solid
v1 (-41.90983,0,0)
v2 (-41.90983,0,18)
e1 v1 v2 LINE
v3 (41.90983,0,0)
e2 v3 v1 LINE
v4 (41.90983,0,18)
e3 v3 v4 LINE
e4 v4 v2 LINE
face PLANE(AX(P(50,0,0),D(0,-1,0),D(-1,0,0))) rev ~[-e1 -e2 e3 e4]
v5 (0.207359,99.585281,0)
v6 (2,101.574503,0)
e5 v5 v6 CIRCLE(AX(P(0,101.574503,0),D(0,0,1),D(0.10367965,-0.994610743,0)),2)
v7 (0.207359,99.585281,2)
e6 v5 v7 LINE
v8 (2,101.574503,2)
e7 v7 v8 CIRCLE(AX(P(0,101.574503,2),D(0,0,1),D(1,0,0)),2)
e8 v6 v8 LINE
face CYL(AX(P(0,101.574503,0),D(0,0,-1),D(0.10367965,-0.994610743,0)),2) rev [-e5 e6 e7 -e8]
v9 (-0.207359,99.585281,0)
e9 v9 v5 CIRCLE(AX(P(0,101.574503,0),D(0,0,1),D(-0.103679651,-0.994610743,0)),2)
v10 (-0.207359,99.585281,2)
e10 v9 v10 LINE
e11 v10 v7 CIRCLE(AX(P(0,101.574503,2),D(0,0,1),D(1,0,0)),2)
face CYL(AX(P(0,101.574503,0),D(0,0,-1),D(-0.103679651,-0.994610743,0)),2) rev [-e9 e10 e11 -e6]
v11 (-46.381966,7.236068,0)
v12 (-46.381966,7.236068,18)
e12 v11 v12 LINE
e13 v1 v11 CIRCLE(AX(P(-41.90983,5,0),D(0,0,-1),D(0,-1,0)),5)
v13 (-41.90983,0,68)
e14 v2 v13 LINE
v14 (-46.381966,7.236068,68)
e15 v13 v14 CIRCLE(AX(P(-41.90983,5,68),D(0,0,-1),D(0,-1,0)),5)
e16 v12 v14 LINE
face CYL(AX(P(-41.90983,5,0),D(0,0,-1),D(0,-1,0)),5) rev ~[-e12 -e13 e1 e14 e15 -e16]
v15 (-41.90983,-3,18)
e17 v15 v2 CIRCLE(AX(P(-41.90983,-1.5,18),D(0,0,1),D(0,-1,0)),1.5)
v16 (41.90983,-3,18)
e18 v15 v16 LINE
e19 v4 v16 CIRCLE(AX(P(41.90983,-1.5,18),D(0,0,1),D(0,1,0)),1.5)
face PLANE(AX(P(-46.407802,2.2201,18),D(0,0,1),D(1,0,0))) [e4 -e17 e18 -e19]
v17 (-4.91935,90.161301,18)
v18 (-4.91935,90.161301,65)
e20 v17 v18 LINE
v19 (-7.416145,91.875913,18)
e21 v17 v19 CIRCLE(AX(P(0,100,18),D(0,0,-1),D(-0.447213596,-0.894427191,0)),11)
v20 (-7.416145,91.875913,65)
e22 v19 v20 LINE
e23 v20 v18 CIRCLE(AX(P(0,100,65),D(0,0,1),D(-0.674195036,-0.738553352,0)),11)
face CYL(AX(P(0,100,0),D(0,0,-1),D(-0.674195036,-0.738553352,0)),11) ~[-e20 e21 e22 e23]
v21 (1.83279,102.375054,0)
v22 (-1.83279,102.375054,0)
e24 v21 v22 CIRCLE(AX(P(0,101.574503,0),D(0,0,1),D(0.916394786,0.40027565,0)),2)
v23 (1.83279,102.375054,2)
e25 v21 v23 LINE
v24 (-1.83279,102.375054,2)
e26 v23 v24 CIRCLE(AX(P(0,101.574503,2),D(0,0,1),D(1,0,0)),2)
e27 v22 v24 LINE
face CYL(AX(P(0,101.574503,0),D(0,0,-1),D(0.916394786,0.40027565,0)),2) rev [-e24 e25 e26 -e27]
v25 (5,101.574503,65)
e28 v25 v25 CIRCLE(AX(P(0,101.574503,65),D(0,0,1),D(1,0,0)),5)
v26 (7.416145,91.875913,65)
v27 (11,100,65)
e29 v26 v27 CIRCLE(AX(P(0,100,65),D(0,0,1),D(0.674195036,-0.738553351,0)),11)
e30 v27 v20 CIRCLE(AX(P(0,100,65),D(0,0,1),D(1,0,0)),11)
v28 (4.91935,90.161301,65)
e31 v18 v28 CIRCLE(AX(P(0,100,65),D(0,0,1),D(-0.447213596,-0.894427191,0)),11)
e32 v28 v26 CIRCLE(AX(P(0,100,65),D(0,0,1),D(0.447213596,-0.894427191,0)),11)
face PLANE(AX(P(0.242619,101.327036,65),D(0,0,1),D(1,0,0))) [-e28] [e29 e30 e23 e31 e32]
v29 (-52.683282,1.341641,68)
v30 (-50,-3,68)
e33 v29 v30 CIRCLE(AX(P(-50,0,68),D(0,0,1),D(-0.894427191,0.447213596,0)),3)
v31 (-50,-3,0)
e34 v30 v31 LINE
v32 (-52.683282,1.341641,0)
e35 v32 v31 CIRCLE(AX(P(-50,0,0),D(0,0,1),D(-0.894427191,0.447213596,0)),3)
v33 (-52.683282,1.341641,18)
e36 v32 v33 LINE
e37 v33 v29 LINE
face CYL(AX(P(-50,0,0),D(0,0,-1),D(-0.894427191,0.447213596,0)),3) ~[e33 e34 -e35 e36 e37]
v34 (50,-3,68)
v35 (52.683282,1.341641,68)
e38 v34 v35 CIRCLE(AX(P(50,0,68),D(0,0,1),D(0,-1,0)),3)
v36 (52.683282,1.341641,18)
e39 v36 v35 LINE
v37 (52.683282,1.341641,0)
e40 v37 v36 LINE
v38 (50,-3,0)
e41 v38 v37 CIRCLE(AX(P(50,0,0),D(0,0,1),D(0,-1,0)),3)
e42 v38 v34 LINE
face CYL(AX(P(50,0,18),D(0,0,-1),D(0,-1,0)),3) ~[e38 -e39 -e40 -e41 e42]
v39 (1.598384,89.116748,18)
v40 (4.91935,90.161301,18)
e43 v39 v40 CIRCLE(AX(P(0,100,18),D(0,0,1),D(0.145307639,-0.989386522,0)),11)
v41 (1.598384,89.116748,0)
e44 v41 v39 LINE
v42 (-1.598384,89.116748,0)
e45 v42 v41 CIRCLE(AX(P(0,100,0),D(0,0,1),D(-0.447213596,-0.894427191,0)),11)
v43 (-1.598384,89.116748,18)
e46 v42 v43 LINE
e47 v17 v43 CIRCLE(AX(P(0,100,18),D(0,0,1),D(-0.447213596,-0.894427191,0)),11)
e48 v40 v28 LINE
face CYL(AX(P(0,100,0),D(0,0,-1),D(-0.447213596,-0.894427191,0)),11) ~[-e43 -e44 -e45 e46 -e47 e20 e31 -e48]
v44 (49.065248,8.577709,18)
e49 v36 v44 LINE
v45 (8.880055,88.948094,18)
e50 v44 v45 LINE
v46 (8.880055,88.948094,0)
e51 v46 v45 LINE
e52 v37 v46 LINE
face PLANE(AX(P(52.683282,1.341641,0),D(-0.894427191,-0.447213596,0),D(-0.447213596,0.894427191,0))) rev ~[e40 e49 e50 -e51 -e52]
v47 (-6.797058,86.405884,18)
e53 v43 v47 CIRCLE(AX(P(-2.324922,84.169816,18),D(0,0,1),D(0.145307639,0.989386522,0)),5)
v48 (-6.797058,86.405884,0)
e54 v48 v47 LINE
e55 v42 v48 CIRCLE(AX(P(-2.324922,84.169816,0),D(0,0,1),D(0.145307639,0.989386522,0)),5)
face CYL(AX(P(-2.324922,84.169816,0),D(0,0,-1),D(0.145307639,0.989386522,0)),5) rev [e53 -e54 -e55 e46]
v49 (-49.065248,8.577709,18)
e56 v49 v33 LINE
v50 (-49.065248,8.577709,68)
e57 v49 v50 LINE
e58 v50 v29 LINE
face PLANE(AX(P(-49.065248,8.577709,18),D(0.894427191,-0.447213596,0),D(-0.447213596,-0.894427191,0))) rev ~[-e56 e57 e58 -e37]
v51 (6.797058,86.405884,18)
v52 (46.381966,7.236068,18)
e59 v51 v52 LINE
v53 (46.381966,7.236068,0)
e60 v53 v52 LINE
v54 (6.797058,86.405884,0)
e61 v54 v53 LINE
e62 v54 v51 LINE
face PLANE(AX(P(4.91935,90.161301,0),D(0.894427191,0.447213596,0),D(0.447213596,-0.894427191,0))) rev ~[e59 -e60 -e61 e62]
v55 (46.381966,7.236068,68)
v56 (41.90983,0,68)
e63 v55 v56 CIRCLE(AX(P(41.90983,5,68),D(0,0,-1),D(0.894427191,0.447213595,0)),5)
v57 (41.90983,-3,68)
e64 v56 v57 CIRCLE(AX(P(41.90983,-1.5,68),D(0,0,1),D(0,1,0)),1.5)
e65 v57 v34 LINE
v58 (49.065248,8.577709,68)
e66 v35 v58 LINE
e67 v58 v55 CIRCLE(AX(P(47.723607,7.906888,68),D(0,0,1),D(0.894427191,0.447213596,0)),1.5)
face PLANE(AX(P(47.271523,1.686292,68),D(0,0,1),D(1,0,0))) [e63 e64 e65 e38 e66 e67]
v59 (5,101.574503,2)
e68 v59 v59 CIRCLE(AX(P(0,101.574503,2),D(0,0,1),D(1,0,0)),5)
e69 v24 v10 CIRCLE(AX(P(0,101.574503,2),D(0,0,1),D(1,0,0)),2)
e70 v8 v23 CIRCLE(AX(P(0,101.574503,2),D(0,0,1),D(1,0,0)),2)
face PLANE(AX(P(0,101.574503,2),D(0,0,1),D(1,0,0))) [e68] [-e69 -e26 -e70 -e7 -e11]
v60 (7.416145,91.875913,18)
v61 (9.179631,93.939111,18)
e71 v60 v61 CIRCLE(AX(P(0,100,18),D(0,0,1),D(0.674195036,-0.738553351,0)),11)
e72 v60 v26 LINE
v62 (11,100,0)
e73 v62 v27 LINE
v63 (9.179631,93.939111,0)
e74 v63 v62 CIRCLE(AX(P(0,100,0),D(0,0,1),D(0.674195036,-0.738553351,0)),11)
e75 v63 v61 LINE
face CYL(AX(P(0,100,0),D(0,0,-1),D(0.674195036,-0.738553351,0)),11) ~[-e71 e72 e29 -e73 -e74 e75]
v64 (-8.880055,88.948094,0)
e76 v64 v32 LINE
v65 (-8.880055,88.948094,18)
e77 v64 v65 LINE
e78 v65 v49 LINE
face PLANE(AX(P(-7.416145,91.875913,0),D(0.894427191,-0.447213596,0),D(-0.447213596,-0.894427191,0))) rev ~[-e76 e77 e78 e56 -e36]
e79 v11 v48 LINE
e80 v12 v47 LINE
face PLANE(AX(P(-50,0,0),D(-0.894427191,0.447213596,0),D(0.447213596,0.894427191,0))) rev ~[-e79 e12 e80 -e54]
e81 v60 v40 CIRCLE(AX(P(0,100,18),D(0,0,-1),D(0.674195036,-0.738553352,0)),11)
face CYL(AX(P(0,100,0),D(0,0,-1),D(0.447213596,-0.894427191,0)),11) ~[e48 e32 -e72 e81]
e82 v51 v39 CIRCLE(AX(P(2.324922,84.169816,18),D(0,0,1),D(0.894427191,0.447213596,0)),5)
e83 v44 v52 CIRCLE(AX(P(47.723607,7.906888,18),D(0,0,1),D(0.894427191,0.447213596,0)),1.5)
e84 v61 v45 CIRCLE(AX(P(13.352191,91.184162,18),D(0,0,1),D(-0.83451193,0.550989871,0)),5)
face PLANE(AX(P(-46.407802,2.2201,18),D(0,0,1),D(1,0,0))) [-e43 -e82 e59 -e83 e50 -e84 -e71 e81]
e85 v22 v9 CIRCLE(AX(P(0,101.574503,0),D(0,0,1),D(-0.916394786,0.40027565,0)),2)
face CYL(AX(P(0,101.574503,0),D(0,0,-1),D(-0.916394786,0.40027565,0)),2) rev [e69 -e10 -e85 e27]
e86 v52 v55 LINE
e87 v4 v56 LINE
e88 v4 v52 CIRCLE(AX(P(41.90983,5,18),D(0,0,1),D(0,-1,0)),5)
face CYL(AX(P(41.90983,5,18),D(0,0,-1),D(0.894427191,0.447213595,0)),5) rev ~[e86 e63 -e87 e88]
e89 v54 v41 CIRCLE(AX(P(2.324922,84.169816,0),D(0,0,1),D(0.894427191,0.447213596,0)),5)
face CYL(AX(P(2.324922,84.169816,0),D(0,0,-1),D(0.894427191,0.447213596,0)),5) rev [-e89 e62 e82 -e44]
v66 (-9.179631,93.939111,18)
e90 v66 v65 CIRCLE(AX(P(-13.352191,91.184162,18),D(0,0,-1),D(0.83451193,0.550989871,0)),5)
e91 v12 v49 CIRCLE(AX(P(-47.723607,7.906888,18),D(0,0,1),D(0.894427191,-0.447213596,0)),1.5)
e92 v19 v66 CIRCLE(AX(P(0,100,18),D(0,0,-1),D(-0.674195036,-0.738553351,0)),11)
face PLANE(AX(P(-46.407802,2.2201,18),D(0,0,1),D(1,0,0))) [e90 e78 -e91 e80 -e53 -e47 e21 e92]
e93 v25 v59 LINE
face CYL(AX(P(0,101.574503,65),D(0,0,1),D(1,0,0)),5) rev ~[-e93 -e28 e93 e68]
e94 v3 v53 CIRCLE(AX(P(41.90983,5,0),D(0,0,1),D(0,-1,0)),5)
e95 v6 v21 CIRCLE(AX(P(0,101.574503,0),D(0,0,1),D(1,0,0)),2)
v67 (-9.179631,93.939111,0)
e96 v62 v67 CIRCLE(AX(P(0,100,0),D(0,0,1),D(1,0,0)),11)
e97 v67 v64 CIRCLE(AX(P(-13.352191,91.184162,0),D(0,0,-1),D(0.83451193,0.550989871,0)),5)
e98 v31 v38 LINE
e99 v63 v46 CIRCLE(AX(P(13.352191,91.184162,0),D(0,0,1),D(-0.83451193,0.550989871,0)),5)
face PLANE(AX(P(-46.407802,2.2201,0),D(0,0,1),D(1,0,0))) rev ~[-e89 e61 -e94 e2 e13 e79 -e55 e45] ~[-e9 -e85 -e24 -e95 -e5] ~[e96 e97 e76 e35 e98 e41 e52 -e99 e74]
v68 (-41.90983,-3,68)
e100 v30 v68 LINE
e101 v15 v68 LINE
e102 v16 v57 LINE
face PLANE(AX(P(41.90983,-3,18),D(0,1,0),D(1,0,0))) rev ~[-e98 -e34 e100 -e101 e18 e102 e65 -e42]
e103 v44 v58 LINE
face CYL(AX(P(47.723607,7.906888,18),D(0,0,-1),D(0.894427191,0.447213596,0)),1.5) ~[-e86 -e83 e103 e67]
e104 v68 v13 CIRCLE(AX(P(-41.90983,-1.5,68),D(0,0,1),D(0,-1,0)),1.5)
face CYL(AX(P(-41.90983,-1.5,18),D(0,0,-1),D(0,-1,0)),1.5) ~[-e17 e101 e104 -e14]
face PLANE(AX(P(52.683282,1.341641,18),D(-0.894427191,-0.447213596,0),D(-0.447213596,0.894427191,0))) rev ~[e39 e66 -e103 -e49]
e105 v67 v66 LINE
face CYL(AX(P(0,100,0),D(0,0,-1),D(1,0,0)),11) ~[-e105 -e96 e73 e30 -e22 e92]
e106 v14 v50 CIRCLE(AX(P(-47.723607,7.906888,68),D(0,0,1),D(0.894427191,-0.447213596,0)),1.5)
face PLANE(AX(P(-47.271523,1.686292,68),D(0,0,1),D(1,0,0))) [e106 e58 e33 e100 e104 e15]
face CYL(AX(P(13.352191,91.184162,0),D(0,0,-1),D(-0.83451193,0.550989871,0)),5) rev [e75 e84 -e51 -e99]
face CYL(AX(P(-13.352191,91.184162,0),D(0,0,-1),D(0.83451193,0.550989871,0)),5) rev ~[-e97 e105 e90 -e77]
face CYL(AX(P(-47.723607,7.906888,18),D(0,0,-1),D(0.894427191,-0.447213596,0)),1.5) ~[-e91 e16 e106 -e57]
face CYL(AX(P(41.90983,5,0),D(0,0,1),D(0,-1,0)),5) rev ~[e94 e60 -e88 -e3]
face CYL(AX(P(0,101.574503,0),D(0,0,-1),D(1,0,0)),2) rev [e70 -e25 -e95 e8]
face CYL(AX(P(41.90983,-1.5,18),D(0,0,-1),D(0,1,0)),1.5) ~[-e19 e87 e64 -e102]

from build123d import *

# Parameters (mm, degrees)
F1_DEPTH    = 65
F2_DEPTH    = 18
F3_DEPTH    = 65
F4_R        = 5
F5_T1_DEPTH = 18
F7_DEPTH    = 50
F8_R        = 5
F8_R_2      = 2
F9_DEPTH    = 63


# Not quite as in the source:
# - a fillet or chamfer that OpenCascade refuses, or shapes differently, is made with other operations: its cross-section is extruded or revolved along the edge and cut away or added


with BuildPart() as f1:
    # F0 (on Top) → F1 (new body)
    with BuildSketch(Plane.XY):
        with BuildLine():
            ThreePointArc((11, 100), (-4.4397297556, 110.0642336865), (-7.4161453995, 91.8759131335))
            Line((-7.4161453995, 91.8759131335), (-4.039885348, 98.6284332366))
            ThreePointArc((-4.039885348, 98.6284332366), (-1.5492858452, 106.3284184683), (5, 101.5745028853))
            ThreePointArc((5, 101.5745028853), (4.753915583, 100.0252170402), (4.039885348, 98.6284332366))
            Line((4.039885348, 98.6284332366), (7.4161453995, 91.8759131335))
            ThreePointArc((7.4161453995, 91.8759131335), (10.0642336865, 95.5602702444), (11, 100))
        make_face()
        with BuildLine():
            Line((-1.5839824005, 96.8320351991), (-4.9193495505, 90.161300899))
            ThreePointArc((-4.9193495505, 90.161300899), (0, 89), (4.9193495505, 90.161300899))
            Line((4.9193495505, 90.161300899), (1.5839824005, 96.8320351991))
            ThreePointArc((1.5839824005, 96.8320351991), (0, 96.5745028853), (-1.5839824005, 96.8320351991))
        make_face()
        with BuildLine():
            ThreePointArc((-7.4161453995, 91.8759131335), (-6.227044459, 90.9322595259), (-4.9193495505, 90.161300899))
            Line((-4.9193495505, 90.161300899), (-1.5839824005, 96.8320351991))
            ThreePointArc((-1.5839824005, 96.8320351991), (-2.9519033843, 97.5388782237), (-4.039885348, 98.6284332366))
            Line((-4.039885348, 98.6284332366), (-7.4161453995, 91.8759131335))
        make_face()
        with BuildLine():
            Line((1.5839824005, 96.8320351991), (4.9193495505, 90.161300899))
            ThreePointArc((4.9193495505, 90.161300899), (6.227044459, 90.9322595259), (7.4161453995, 91.8759131335))
            Line((7.4161453995, 91.8759131335), (4.039885348, 98.6284332366))
            ThreePointArc((4.039885348, 98.6284332366), (2.9519033843, 97.5388782237), (1.5839824005, 96.8320351991))
        make_face()
        with BuildLine():
            Line((-0.2073593004, 99.5852813993), (-1.5839824005, 96.8320351991))
            ThreePointArc((-1.5839824005, 96.8320351991), (0, 96.5745028853), (1.5839824005, 96.8320351991))
            Line((1.5839824005, 96.8320351991), (0.2073593004, 99.5852813993))
            ThreePointArc((0.2073593004, 99.5852813993), (0, 99.5745028853), (-0.2073593004, 99.5852813993))
        make_face()
        with BuildLine():
            ThreePointArc((-4.039885348, 98.6284332366), (-2.9519033843, 97.5388782237), (-1.5839824005, 96.8320351991))
            Line((-1.5839824005, 96.8320351991), (-0.2073593004, 99.5852813993))
            ThreePointArc((-0.2073593004, 99.5852813993), (-1.7280798318, 100.567656276), (-1.8327895721, 102.3750541855))
            ThreePointArc((-1.8327895721, 102.3750541855), (-2.3164003238, 101.9063812682), (-2.683281573, 101.3416407865))
            Line((-2.683281573, 101.3416407865), (-4.039885348, 98.6284332366))
        make_face()
        with BuildLine():
            ThreePointArc((5, 101.5745028853), (-1.5492858452, 106.3284184683), (-4.039885348, 98.6284332366))
            Line((-4.039885348, 98.6284332366), (-2.683281573, 101.3416407865))
            ThreePointArc((-2.683281573, 101.3416407865), (-2.3164003238, 101.9063812682), (-1.8327895721, 102.3750541855))
            ThreePointArc((-1.8327895721, 102.3750541855), (0, 103.5745028853), (1.8327895721, 102.3750541855))
            ThreePointArc((1.8327895721, 102.3750541855), (2.3164003238, 101.9063812682), (2.683281573, 101.3416407865))
            Line((2.683281573, 101.3416407865), (4.039885348, 98.6284332366))
            ThreePointArc((4.039885348, 98.6284332366), (4.753915583, 100.0252170402), (5, 101.5745028853))
        make_face()
        with BuildLine():
            Line((0.2073593004, 99.5852813993), (1.5839824005, 96.8320351991))
            ThreePointArc((1.5839824005, 96.8320351991), (2.9519033843, 97.5388782237), (4.039885348, 98.6284332366))
            Line((4.039885348, 98.6284332366), (2.683281573, 101.3416407865))
            ThreePointArc((2.683281573, 101.3416407865), (2.3164003238, 101.9063812682), (1.8327895721, 102.3750541855))
            ThreePointArc((1.8327895721, 102.3750541855), (1.9577511517, 101.9834166022), (2, 101.5745028853))
            ThreePointArc((2, 101.5745028853), (1.4857184459, 100.2356075572), (0.2073593004, 99.5852813993))
        make_face()
        with BuildLine():
            ThreePointArc((-1.8327895721, 102.3750541855), (-1.7280798318, 100.567656276), (-0.2073593004, 99.5852813993))
            Line((-0.2073593004, 99.5852813993), (0, 100))
            Line((0, 100), (0.2073593004, 99.5852813993))
            ThreePointArc((0.2073593004, 99.5852813993), (1.4857184459, 100.2356075572), (2, 101.5745028853))
            ThreePointArc((2, 101.5745028853), (1.9577511517, 101.9834166022), (1.8327895721, 102.3750541855))
            ThreePointArc((1.8327895721, 102.3750541855), (0, 103), (-1.8327895721, 102.3750541855))
        make_face()
        with BuildLine():
            Line((0, 100), (-0.2073593004, 99.5852813993))
            ThreePointArc((-0.2073593004, 99.5852813993), (0, 99.5745028853), (0.2073593004, 99.5852813993))
            Line((0.2073593004, 99.5852813993), (0, 100))
        make_face()
        with BuildLine():
            ThreePointArc((1.8327895721, 102.3750541855), (0, 103.5745028853), (-1.8327895721, 102.3750541855))
            ThreePointArc((-1.8327895721, 102.3750541855), (0, 103), (1.8327895721, 102.3750541855))
        make_face()
    extrude(amount=F1_DEPTH)

    # F0 (on Top) → F2 (join)
    with BuildSketch(Plane.XY):
        with BuildLine():
            Line((50, 0), (-50, 0))
            Line((-50, 0), (-4.9193495505, 90.161300899))
            ThreePointArc((-4.9193495505, 90.161300899), (-6.227044459, 90.9322595259), (-7.4161453995, 91.8759131335))
            Line((-7.4161453995, 91.8759131335), (-52.683281573, 1.3416407865))
            ThreePointArc((-52.683281573, 1.3416407865), (-52.5519524251, -1.5771933364), (-50, -3))
            Line((-50, -3), (50, -3))
            ThreePointArc((50, -3), (52.5519524251, -1.5771933364), (52.683281573, 1.3416407865))
            Line((52.683281573, 1.3416407865), (7.4161453995, 91.8759131335))
            ThreePointArc((7.4161453995, 91.8759131335), (6.227044459, 90.9322595259), (4.9193495505, 90.161300899))
            Line((4.9193495505, 90.161300899), (50, 0))
        make_face()
    extrude(amount=F2_DEPTH)

    # F0 (on Top) → F3 (cut)
    with BuildSketch(Plane.XY):
        with BuildLine():
            ThreePointArc((-1.8327895721, 102.3750541855), (-1.7280798318, 100.567656276), (-0.2073593004, 99.5852813993))
            Line((-0.2073593004, 99.5852813993), (0, 100))
            Line((0, 100), (0.2073593004, 99.5852813993))
            ThreePointArc((0.2073593004, 99.5852813993), (1.4857184459, 100.2356075572), (2, 101.5745028853))
            ThreePointArc((2, 101.5745028853), (1.9577511517, 101.9834166022), (1.8327895721, 102.3750541855))
            ThreePointArc((1.8327895721, 102.3750541855), (0, 103), (-1.8327895721, 102.3750541855))
        make_face()
        with BuildLine():
            ThreePointArc((1.8327895721, 102.3750541855), (0, 103.5745028853), (-1.8327895721, 102.3750541855))
            ThreePointArc((-1.8327895721, 102.3750541855), (0, 103), (1.8327895721, 102.3750541855))
        make_face()
        with BuildLine():
            Line((0, 100), (-0.2073593004, 99.5852813993))
            ThreePointArc((-0.2073593004, 99.5852813993), (0, 99.5745028853), (0.2073593004, 99.5852813993))
            Line((0.2073593004, 99.5852813993), (0, 100))
        make_face()
    extrude(amount=F3_DEPTH, mode=Mode.SUBTRACT)

    # F4
    f4_edges = [f1.edges().sort_by_distance(p)[0] for p in [
        (50, 0, 9),
    ]]
    fillet(f4_edges, radius=F4_R)

    # F5: fillet of radius 5 on 5 edges, made by hand

    # F5_s2 → F5_t1 (join)
    with BuildSketch(Plane.XY):
        with BuildLine():
            ThreePointArc((-41.9098300563, 0), (-46.163084098, 2.3713444394), (-46.3819660113, 7.2360679775))
            Line((-46.3819660113, 7.2360679775), (-50, 0))
            Line((-50, 0), (-41.9098300563, 0))
        make_face()
        with BuildLine():
            ThreePointArc((6.7970581872, 86.4058836256), (4.6367553585, 88.6032598618), (1.5983840346, 89.1167482581))
            ThreePointArc((1.5983840346, 89.1167482581), (3.3004522912, 89.5068110341), (4.9193495505, 90.161300899))
            Line((4.9193495505, 90.161300899), (6.7970581872, 86.4058836256))
        make_face()
        with BuildLine():
            ThreePointArc((9.1796312313, 93.9391114136), (8.361173547, 91.4837383605), (8.8800549269, 88.9480940786))
            Line((8.8800549269, 88.9480940786), (7.4161453995, 91.8759131335))
            ThreePointArc((7.4161453995, 91.8759131335), (8.3617669951, 92.8529129906), (9.1796312313, 93.9391114136))
        make_face()
        with BuildLine():
            ThreePointArc((-9.1796312313, 93.9391114136), (-8.361173547, 91.4837383605), (-8.8800549269, 88.9480940786))
            Line((-8.8800549269, 88.9480940786), (-7.4161453995, 91.8759131335))
            ThreePointArc((-7.4161453995, 91.8759131335), (-8.3617669951, 92.8529129906), (-9.1796312313, 93.9391114136))
        make_face()
        with BuildLine():
            ThreePointArc((-1.5983840346, 89.1167482581), (-4.6367553585, 88.6032598618), (-6.7970581872, 86.4058836256))
            Line((-6.7970581872, 86.4058836256), (-4.9193495505, 90.161300899))
            ThreePointArc((-4.9193495505, 90.161300899), (-3.3004522912, 89.5068110341), (-1.5983840346, 89.1167482581))
        make_face()
    extrude(amount=F5_T1_DEPTH)

    # F6 (on face) → F7 (join)
    with BuildSketch(Plane.XY.offset(18)):
        with BuildLine():
            ThreePointArc((41.9098300563, 0), (40.4098300563, -1.5), (41.9098300563, -3))
            Line((41.9098300563, -3), (50, -3))
            ThreePointArc((50, -3), (52.5519524251, -1.5771933364), (52.683281573, 1.3416407865))
            Line((52.683281573, 1.3416407865), (49.0652475842, 8.577708764))
            ThreePointArc((49.0652475842, 8.577708764), (47.0527864045, 9.2485291572), (46.3819660113, 7.2360679775))
            ThreePointArc((46.3819660113, 7.2360679775), (46.163084098, 2.3713444394), (41.9098300563, 0))
        make_face()
        with BuildLine():
            Line((-50, -3), (-41.9098300563, -3))
            ThreePointArc((-41.9098300563, -3), (-40.4098300563, -1.5), (-41.9098300563, 0))
            ThreePointArc((-41.9098300563, 0), (-46.163084098, 2.3713444394), (-46.3819660113, 7.2360679775))
            ThreePointArc((-46.3819660113, 7.2360679775), (-47.0527864045, 9.2485291572), (-49.0652475842, 8.577708764))
            Line((-49.0652475842, 8.577708764), (-52.683281573, 1.3416407865))
            ThreePointArc((-52.683281573, 1.3416407865), (-52.5519524251, -1.5771933364), (-50, -3))
        make_face()
    extrude(amount=F7_DEPTH)

    # F8 (on face) → F9 (cut)
    with BuildSketch(Plane.XY.offset(65)):
        with Locations((0, 101.5745028853)):
            Circle(F8_R)
        with Locations((0, 101.5745028853)):
            Circle(F8_R_2, mode=Mode.SUBTRACT)
    extrude(amount=-F9_DEPTH, mode=Mode.SUBTRACT)


solid = f1.part
